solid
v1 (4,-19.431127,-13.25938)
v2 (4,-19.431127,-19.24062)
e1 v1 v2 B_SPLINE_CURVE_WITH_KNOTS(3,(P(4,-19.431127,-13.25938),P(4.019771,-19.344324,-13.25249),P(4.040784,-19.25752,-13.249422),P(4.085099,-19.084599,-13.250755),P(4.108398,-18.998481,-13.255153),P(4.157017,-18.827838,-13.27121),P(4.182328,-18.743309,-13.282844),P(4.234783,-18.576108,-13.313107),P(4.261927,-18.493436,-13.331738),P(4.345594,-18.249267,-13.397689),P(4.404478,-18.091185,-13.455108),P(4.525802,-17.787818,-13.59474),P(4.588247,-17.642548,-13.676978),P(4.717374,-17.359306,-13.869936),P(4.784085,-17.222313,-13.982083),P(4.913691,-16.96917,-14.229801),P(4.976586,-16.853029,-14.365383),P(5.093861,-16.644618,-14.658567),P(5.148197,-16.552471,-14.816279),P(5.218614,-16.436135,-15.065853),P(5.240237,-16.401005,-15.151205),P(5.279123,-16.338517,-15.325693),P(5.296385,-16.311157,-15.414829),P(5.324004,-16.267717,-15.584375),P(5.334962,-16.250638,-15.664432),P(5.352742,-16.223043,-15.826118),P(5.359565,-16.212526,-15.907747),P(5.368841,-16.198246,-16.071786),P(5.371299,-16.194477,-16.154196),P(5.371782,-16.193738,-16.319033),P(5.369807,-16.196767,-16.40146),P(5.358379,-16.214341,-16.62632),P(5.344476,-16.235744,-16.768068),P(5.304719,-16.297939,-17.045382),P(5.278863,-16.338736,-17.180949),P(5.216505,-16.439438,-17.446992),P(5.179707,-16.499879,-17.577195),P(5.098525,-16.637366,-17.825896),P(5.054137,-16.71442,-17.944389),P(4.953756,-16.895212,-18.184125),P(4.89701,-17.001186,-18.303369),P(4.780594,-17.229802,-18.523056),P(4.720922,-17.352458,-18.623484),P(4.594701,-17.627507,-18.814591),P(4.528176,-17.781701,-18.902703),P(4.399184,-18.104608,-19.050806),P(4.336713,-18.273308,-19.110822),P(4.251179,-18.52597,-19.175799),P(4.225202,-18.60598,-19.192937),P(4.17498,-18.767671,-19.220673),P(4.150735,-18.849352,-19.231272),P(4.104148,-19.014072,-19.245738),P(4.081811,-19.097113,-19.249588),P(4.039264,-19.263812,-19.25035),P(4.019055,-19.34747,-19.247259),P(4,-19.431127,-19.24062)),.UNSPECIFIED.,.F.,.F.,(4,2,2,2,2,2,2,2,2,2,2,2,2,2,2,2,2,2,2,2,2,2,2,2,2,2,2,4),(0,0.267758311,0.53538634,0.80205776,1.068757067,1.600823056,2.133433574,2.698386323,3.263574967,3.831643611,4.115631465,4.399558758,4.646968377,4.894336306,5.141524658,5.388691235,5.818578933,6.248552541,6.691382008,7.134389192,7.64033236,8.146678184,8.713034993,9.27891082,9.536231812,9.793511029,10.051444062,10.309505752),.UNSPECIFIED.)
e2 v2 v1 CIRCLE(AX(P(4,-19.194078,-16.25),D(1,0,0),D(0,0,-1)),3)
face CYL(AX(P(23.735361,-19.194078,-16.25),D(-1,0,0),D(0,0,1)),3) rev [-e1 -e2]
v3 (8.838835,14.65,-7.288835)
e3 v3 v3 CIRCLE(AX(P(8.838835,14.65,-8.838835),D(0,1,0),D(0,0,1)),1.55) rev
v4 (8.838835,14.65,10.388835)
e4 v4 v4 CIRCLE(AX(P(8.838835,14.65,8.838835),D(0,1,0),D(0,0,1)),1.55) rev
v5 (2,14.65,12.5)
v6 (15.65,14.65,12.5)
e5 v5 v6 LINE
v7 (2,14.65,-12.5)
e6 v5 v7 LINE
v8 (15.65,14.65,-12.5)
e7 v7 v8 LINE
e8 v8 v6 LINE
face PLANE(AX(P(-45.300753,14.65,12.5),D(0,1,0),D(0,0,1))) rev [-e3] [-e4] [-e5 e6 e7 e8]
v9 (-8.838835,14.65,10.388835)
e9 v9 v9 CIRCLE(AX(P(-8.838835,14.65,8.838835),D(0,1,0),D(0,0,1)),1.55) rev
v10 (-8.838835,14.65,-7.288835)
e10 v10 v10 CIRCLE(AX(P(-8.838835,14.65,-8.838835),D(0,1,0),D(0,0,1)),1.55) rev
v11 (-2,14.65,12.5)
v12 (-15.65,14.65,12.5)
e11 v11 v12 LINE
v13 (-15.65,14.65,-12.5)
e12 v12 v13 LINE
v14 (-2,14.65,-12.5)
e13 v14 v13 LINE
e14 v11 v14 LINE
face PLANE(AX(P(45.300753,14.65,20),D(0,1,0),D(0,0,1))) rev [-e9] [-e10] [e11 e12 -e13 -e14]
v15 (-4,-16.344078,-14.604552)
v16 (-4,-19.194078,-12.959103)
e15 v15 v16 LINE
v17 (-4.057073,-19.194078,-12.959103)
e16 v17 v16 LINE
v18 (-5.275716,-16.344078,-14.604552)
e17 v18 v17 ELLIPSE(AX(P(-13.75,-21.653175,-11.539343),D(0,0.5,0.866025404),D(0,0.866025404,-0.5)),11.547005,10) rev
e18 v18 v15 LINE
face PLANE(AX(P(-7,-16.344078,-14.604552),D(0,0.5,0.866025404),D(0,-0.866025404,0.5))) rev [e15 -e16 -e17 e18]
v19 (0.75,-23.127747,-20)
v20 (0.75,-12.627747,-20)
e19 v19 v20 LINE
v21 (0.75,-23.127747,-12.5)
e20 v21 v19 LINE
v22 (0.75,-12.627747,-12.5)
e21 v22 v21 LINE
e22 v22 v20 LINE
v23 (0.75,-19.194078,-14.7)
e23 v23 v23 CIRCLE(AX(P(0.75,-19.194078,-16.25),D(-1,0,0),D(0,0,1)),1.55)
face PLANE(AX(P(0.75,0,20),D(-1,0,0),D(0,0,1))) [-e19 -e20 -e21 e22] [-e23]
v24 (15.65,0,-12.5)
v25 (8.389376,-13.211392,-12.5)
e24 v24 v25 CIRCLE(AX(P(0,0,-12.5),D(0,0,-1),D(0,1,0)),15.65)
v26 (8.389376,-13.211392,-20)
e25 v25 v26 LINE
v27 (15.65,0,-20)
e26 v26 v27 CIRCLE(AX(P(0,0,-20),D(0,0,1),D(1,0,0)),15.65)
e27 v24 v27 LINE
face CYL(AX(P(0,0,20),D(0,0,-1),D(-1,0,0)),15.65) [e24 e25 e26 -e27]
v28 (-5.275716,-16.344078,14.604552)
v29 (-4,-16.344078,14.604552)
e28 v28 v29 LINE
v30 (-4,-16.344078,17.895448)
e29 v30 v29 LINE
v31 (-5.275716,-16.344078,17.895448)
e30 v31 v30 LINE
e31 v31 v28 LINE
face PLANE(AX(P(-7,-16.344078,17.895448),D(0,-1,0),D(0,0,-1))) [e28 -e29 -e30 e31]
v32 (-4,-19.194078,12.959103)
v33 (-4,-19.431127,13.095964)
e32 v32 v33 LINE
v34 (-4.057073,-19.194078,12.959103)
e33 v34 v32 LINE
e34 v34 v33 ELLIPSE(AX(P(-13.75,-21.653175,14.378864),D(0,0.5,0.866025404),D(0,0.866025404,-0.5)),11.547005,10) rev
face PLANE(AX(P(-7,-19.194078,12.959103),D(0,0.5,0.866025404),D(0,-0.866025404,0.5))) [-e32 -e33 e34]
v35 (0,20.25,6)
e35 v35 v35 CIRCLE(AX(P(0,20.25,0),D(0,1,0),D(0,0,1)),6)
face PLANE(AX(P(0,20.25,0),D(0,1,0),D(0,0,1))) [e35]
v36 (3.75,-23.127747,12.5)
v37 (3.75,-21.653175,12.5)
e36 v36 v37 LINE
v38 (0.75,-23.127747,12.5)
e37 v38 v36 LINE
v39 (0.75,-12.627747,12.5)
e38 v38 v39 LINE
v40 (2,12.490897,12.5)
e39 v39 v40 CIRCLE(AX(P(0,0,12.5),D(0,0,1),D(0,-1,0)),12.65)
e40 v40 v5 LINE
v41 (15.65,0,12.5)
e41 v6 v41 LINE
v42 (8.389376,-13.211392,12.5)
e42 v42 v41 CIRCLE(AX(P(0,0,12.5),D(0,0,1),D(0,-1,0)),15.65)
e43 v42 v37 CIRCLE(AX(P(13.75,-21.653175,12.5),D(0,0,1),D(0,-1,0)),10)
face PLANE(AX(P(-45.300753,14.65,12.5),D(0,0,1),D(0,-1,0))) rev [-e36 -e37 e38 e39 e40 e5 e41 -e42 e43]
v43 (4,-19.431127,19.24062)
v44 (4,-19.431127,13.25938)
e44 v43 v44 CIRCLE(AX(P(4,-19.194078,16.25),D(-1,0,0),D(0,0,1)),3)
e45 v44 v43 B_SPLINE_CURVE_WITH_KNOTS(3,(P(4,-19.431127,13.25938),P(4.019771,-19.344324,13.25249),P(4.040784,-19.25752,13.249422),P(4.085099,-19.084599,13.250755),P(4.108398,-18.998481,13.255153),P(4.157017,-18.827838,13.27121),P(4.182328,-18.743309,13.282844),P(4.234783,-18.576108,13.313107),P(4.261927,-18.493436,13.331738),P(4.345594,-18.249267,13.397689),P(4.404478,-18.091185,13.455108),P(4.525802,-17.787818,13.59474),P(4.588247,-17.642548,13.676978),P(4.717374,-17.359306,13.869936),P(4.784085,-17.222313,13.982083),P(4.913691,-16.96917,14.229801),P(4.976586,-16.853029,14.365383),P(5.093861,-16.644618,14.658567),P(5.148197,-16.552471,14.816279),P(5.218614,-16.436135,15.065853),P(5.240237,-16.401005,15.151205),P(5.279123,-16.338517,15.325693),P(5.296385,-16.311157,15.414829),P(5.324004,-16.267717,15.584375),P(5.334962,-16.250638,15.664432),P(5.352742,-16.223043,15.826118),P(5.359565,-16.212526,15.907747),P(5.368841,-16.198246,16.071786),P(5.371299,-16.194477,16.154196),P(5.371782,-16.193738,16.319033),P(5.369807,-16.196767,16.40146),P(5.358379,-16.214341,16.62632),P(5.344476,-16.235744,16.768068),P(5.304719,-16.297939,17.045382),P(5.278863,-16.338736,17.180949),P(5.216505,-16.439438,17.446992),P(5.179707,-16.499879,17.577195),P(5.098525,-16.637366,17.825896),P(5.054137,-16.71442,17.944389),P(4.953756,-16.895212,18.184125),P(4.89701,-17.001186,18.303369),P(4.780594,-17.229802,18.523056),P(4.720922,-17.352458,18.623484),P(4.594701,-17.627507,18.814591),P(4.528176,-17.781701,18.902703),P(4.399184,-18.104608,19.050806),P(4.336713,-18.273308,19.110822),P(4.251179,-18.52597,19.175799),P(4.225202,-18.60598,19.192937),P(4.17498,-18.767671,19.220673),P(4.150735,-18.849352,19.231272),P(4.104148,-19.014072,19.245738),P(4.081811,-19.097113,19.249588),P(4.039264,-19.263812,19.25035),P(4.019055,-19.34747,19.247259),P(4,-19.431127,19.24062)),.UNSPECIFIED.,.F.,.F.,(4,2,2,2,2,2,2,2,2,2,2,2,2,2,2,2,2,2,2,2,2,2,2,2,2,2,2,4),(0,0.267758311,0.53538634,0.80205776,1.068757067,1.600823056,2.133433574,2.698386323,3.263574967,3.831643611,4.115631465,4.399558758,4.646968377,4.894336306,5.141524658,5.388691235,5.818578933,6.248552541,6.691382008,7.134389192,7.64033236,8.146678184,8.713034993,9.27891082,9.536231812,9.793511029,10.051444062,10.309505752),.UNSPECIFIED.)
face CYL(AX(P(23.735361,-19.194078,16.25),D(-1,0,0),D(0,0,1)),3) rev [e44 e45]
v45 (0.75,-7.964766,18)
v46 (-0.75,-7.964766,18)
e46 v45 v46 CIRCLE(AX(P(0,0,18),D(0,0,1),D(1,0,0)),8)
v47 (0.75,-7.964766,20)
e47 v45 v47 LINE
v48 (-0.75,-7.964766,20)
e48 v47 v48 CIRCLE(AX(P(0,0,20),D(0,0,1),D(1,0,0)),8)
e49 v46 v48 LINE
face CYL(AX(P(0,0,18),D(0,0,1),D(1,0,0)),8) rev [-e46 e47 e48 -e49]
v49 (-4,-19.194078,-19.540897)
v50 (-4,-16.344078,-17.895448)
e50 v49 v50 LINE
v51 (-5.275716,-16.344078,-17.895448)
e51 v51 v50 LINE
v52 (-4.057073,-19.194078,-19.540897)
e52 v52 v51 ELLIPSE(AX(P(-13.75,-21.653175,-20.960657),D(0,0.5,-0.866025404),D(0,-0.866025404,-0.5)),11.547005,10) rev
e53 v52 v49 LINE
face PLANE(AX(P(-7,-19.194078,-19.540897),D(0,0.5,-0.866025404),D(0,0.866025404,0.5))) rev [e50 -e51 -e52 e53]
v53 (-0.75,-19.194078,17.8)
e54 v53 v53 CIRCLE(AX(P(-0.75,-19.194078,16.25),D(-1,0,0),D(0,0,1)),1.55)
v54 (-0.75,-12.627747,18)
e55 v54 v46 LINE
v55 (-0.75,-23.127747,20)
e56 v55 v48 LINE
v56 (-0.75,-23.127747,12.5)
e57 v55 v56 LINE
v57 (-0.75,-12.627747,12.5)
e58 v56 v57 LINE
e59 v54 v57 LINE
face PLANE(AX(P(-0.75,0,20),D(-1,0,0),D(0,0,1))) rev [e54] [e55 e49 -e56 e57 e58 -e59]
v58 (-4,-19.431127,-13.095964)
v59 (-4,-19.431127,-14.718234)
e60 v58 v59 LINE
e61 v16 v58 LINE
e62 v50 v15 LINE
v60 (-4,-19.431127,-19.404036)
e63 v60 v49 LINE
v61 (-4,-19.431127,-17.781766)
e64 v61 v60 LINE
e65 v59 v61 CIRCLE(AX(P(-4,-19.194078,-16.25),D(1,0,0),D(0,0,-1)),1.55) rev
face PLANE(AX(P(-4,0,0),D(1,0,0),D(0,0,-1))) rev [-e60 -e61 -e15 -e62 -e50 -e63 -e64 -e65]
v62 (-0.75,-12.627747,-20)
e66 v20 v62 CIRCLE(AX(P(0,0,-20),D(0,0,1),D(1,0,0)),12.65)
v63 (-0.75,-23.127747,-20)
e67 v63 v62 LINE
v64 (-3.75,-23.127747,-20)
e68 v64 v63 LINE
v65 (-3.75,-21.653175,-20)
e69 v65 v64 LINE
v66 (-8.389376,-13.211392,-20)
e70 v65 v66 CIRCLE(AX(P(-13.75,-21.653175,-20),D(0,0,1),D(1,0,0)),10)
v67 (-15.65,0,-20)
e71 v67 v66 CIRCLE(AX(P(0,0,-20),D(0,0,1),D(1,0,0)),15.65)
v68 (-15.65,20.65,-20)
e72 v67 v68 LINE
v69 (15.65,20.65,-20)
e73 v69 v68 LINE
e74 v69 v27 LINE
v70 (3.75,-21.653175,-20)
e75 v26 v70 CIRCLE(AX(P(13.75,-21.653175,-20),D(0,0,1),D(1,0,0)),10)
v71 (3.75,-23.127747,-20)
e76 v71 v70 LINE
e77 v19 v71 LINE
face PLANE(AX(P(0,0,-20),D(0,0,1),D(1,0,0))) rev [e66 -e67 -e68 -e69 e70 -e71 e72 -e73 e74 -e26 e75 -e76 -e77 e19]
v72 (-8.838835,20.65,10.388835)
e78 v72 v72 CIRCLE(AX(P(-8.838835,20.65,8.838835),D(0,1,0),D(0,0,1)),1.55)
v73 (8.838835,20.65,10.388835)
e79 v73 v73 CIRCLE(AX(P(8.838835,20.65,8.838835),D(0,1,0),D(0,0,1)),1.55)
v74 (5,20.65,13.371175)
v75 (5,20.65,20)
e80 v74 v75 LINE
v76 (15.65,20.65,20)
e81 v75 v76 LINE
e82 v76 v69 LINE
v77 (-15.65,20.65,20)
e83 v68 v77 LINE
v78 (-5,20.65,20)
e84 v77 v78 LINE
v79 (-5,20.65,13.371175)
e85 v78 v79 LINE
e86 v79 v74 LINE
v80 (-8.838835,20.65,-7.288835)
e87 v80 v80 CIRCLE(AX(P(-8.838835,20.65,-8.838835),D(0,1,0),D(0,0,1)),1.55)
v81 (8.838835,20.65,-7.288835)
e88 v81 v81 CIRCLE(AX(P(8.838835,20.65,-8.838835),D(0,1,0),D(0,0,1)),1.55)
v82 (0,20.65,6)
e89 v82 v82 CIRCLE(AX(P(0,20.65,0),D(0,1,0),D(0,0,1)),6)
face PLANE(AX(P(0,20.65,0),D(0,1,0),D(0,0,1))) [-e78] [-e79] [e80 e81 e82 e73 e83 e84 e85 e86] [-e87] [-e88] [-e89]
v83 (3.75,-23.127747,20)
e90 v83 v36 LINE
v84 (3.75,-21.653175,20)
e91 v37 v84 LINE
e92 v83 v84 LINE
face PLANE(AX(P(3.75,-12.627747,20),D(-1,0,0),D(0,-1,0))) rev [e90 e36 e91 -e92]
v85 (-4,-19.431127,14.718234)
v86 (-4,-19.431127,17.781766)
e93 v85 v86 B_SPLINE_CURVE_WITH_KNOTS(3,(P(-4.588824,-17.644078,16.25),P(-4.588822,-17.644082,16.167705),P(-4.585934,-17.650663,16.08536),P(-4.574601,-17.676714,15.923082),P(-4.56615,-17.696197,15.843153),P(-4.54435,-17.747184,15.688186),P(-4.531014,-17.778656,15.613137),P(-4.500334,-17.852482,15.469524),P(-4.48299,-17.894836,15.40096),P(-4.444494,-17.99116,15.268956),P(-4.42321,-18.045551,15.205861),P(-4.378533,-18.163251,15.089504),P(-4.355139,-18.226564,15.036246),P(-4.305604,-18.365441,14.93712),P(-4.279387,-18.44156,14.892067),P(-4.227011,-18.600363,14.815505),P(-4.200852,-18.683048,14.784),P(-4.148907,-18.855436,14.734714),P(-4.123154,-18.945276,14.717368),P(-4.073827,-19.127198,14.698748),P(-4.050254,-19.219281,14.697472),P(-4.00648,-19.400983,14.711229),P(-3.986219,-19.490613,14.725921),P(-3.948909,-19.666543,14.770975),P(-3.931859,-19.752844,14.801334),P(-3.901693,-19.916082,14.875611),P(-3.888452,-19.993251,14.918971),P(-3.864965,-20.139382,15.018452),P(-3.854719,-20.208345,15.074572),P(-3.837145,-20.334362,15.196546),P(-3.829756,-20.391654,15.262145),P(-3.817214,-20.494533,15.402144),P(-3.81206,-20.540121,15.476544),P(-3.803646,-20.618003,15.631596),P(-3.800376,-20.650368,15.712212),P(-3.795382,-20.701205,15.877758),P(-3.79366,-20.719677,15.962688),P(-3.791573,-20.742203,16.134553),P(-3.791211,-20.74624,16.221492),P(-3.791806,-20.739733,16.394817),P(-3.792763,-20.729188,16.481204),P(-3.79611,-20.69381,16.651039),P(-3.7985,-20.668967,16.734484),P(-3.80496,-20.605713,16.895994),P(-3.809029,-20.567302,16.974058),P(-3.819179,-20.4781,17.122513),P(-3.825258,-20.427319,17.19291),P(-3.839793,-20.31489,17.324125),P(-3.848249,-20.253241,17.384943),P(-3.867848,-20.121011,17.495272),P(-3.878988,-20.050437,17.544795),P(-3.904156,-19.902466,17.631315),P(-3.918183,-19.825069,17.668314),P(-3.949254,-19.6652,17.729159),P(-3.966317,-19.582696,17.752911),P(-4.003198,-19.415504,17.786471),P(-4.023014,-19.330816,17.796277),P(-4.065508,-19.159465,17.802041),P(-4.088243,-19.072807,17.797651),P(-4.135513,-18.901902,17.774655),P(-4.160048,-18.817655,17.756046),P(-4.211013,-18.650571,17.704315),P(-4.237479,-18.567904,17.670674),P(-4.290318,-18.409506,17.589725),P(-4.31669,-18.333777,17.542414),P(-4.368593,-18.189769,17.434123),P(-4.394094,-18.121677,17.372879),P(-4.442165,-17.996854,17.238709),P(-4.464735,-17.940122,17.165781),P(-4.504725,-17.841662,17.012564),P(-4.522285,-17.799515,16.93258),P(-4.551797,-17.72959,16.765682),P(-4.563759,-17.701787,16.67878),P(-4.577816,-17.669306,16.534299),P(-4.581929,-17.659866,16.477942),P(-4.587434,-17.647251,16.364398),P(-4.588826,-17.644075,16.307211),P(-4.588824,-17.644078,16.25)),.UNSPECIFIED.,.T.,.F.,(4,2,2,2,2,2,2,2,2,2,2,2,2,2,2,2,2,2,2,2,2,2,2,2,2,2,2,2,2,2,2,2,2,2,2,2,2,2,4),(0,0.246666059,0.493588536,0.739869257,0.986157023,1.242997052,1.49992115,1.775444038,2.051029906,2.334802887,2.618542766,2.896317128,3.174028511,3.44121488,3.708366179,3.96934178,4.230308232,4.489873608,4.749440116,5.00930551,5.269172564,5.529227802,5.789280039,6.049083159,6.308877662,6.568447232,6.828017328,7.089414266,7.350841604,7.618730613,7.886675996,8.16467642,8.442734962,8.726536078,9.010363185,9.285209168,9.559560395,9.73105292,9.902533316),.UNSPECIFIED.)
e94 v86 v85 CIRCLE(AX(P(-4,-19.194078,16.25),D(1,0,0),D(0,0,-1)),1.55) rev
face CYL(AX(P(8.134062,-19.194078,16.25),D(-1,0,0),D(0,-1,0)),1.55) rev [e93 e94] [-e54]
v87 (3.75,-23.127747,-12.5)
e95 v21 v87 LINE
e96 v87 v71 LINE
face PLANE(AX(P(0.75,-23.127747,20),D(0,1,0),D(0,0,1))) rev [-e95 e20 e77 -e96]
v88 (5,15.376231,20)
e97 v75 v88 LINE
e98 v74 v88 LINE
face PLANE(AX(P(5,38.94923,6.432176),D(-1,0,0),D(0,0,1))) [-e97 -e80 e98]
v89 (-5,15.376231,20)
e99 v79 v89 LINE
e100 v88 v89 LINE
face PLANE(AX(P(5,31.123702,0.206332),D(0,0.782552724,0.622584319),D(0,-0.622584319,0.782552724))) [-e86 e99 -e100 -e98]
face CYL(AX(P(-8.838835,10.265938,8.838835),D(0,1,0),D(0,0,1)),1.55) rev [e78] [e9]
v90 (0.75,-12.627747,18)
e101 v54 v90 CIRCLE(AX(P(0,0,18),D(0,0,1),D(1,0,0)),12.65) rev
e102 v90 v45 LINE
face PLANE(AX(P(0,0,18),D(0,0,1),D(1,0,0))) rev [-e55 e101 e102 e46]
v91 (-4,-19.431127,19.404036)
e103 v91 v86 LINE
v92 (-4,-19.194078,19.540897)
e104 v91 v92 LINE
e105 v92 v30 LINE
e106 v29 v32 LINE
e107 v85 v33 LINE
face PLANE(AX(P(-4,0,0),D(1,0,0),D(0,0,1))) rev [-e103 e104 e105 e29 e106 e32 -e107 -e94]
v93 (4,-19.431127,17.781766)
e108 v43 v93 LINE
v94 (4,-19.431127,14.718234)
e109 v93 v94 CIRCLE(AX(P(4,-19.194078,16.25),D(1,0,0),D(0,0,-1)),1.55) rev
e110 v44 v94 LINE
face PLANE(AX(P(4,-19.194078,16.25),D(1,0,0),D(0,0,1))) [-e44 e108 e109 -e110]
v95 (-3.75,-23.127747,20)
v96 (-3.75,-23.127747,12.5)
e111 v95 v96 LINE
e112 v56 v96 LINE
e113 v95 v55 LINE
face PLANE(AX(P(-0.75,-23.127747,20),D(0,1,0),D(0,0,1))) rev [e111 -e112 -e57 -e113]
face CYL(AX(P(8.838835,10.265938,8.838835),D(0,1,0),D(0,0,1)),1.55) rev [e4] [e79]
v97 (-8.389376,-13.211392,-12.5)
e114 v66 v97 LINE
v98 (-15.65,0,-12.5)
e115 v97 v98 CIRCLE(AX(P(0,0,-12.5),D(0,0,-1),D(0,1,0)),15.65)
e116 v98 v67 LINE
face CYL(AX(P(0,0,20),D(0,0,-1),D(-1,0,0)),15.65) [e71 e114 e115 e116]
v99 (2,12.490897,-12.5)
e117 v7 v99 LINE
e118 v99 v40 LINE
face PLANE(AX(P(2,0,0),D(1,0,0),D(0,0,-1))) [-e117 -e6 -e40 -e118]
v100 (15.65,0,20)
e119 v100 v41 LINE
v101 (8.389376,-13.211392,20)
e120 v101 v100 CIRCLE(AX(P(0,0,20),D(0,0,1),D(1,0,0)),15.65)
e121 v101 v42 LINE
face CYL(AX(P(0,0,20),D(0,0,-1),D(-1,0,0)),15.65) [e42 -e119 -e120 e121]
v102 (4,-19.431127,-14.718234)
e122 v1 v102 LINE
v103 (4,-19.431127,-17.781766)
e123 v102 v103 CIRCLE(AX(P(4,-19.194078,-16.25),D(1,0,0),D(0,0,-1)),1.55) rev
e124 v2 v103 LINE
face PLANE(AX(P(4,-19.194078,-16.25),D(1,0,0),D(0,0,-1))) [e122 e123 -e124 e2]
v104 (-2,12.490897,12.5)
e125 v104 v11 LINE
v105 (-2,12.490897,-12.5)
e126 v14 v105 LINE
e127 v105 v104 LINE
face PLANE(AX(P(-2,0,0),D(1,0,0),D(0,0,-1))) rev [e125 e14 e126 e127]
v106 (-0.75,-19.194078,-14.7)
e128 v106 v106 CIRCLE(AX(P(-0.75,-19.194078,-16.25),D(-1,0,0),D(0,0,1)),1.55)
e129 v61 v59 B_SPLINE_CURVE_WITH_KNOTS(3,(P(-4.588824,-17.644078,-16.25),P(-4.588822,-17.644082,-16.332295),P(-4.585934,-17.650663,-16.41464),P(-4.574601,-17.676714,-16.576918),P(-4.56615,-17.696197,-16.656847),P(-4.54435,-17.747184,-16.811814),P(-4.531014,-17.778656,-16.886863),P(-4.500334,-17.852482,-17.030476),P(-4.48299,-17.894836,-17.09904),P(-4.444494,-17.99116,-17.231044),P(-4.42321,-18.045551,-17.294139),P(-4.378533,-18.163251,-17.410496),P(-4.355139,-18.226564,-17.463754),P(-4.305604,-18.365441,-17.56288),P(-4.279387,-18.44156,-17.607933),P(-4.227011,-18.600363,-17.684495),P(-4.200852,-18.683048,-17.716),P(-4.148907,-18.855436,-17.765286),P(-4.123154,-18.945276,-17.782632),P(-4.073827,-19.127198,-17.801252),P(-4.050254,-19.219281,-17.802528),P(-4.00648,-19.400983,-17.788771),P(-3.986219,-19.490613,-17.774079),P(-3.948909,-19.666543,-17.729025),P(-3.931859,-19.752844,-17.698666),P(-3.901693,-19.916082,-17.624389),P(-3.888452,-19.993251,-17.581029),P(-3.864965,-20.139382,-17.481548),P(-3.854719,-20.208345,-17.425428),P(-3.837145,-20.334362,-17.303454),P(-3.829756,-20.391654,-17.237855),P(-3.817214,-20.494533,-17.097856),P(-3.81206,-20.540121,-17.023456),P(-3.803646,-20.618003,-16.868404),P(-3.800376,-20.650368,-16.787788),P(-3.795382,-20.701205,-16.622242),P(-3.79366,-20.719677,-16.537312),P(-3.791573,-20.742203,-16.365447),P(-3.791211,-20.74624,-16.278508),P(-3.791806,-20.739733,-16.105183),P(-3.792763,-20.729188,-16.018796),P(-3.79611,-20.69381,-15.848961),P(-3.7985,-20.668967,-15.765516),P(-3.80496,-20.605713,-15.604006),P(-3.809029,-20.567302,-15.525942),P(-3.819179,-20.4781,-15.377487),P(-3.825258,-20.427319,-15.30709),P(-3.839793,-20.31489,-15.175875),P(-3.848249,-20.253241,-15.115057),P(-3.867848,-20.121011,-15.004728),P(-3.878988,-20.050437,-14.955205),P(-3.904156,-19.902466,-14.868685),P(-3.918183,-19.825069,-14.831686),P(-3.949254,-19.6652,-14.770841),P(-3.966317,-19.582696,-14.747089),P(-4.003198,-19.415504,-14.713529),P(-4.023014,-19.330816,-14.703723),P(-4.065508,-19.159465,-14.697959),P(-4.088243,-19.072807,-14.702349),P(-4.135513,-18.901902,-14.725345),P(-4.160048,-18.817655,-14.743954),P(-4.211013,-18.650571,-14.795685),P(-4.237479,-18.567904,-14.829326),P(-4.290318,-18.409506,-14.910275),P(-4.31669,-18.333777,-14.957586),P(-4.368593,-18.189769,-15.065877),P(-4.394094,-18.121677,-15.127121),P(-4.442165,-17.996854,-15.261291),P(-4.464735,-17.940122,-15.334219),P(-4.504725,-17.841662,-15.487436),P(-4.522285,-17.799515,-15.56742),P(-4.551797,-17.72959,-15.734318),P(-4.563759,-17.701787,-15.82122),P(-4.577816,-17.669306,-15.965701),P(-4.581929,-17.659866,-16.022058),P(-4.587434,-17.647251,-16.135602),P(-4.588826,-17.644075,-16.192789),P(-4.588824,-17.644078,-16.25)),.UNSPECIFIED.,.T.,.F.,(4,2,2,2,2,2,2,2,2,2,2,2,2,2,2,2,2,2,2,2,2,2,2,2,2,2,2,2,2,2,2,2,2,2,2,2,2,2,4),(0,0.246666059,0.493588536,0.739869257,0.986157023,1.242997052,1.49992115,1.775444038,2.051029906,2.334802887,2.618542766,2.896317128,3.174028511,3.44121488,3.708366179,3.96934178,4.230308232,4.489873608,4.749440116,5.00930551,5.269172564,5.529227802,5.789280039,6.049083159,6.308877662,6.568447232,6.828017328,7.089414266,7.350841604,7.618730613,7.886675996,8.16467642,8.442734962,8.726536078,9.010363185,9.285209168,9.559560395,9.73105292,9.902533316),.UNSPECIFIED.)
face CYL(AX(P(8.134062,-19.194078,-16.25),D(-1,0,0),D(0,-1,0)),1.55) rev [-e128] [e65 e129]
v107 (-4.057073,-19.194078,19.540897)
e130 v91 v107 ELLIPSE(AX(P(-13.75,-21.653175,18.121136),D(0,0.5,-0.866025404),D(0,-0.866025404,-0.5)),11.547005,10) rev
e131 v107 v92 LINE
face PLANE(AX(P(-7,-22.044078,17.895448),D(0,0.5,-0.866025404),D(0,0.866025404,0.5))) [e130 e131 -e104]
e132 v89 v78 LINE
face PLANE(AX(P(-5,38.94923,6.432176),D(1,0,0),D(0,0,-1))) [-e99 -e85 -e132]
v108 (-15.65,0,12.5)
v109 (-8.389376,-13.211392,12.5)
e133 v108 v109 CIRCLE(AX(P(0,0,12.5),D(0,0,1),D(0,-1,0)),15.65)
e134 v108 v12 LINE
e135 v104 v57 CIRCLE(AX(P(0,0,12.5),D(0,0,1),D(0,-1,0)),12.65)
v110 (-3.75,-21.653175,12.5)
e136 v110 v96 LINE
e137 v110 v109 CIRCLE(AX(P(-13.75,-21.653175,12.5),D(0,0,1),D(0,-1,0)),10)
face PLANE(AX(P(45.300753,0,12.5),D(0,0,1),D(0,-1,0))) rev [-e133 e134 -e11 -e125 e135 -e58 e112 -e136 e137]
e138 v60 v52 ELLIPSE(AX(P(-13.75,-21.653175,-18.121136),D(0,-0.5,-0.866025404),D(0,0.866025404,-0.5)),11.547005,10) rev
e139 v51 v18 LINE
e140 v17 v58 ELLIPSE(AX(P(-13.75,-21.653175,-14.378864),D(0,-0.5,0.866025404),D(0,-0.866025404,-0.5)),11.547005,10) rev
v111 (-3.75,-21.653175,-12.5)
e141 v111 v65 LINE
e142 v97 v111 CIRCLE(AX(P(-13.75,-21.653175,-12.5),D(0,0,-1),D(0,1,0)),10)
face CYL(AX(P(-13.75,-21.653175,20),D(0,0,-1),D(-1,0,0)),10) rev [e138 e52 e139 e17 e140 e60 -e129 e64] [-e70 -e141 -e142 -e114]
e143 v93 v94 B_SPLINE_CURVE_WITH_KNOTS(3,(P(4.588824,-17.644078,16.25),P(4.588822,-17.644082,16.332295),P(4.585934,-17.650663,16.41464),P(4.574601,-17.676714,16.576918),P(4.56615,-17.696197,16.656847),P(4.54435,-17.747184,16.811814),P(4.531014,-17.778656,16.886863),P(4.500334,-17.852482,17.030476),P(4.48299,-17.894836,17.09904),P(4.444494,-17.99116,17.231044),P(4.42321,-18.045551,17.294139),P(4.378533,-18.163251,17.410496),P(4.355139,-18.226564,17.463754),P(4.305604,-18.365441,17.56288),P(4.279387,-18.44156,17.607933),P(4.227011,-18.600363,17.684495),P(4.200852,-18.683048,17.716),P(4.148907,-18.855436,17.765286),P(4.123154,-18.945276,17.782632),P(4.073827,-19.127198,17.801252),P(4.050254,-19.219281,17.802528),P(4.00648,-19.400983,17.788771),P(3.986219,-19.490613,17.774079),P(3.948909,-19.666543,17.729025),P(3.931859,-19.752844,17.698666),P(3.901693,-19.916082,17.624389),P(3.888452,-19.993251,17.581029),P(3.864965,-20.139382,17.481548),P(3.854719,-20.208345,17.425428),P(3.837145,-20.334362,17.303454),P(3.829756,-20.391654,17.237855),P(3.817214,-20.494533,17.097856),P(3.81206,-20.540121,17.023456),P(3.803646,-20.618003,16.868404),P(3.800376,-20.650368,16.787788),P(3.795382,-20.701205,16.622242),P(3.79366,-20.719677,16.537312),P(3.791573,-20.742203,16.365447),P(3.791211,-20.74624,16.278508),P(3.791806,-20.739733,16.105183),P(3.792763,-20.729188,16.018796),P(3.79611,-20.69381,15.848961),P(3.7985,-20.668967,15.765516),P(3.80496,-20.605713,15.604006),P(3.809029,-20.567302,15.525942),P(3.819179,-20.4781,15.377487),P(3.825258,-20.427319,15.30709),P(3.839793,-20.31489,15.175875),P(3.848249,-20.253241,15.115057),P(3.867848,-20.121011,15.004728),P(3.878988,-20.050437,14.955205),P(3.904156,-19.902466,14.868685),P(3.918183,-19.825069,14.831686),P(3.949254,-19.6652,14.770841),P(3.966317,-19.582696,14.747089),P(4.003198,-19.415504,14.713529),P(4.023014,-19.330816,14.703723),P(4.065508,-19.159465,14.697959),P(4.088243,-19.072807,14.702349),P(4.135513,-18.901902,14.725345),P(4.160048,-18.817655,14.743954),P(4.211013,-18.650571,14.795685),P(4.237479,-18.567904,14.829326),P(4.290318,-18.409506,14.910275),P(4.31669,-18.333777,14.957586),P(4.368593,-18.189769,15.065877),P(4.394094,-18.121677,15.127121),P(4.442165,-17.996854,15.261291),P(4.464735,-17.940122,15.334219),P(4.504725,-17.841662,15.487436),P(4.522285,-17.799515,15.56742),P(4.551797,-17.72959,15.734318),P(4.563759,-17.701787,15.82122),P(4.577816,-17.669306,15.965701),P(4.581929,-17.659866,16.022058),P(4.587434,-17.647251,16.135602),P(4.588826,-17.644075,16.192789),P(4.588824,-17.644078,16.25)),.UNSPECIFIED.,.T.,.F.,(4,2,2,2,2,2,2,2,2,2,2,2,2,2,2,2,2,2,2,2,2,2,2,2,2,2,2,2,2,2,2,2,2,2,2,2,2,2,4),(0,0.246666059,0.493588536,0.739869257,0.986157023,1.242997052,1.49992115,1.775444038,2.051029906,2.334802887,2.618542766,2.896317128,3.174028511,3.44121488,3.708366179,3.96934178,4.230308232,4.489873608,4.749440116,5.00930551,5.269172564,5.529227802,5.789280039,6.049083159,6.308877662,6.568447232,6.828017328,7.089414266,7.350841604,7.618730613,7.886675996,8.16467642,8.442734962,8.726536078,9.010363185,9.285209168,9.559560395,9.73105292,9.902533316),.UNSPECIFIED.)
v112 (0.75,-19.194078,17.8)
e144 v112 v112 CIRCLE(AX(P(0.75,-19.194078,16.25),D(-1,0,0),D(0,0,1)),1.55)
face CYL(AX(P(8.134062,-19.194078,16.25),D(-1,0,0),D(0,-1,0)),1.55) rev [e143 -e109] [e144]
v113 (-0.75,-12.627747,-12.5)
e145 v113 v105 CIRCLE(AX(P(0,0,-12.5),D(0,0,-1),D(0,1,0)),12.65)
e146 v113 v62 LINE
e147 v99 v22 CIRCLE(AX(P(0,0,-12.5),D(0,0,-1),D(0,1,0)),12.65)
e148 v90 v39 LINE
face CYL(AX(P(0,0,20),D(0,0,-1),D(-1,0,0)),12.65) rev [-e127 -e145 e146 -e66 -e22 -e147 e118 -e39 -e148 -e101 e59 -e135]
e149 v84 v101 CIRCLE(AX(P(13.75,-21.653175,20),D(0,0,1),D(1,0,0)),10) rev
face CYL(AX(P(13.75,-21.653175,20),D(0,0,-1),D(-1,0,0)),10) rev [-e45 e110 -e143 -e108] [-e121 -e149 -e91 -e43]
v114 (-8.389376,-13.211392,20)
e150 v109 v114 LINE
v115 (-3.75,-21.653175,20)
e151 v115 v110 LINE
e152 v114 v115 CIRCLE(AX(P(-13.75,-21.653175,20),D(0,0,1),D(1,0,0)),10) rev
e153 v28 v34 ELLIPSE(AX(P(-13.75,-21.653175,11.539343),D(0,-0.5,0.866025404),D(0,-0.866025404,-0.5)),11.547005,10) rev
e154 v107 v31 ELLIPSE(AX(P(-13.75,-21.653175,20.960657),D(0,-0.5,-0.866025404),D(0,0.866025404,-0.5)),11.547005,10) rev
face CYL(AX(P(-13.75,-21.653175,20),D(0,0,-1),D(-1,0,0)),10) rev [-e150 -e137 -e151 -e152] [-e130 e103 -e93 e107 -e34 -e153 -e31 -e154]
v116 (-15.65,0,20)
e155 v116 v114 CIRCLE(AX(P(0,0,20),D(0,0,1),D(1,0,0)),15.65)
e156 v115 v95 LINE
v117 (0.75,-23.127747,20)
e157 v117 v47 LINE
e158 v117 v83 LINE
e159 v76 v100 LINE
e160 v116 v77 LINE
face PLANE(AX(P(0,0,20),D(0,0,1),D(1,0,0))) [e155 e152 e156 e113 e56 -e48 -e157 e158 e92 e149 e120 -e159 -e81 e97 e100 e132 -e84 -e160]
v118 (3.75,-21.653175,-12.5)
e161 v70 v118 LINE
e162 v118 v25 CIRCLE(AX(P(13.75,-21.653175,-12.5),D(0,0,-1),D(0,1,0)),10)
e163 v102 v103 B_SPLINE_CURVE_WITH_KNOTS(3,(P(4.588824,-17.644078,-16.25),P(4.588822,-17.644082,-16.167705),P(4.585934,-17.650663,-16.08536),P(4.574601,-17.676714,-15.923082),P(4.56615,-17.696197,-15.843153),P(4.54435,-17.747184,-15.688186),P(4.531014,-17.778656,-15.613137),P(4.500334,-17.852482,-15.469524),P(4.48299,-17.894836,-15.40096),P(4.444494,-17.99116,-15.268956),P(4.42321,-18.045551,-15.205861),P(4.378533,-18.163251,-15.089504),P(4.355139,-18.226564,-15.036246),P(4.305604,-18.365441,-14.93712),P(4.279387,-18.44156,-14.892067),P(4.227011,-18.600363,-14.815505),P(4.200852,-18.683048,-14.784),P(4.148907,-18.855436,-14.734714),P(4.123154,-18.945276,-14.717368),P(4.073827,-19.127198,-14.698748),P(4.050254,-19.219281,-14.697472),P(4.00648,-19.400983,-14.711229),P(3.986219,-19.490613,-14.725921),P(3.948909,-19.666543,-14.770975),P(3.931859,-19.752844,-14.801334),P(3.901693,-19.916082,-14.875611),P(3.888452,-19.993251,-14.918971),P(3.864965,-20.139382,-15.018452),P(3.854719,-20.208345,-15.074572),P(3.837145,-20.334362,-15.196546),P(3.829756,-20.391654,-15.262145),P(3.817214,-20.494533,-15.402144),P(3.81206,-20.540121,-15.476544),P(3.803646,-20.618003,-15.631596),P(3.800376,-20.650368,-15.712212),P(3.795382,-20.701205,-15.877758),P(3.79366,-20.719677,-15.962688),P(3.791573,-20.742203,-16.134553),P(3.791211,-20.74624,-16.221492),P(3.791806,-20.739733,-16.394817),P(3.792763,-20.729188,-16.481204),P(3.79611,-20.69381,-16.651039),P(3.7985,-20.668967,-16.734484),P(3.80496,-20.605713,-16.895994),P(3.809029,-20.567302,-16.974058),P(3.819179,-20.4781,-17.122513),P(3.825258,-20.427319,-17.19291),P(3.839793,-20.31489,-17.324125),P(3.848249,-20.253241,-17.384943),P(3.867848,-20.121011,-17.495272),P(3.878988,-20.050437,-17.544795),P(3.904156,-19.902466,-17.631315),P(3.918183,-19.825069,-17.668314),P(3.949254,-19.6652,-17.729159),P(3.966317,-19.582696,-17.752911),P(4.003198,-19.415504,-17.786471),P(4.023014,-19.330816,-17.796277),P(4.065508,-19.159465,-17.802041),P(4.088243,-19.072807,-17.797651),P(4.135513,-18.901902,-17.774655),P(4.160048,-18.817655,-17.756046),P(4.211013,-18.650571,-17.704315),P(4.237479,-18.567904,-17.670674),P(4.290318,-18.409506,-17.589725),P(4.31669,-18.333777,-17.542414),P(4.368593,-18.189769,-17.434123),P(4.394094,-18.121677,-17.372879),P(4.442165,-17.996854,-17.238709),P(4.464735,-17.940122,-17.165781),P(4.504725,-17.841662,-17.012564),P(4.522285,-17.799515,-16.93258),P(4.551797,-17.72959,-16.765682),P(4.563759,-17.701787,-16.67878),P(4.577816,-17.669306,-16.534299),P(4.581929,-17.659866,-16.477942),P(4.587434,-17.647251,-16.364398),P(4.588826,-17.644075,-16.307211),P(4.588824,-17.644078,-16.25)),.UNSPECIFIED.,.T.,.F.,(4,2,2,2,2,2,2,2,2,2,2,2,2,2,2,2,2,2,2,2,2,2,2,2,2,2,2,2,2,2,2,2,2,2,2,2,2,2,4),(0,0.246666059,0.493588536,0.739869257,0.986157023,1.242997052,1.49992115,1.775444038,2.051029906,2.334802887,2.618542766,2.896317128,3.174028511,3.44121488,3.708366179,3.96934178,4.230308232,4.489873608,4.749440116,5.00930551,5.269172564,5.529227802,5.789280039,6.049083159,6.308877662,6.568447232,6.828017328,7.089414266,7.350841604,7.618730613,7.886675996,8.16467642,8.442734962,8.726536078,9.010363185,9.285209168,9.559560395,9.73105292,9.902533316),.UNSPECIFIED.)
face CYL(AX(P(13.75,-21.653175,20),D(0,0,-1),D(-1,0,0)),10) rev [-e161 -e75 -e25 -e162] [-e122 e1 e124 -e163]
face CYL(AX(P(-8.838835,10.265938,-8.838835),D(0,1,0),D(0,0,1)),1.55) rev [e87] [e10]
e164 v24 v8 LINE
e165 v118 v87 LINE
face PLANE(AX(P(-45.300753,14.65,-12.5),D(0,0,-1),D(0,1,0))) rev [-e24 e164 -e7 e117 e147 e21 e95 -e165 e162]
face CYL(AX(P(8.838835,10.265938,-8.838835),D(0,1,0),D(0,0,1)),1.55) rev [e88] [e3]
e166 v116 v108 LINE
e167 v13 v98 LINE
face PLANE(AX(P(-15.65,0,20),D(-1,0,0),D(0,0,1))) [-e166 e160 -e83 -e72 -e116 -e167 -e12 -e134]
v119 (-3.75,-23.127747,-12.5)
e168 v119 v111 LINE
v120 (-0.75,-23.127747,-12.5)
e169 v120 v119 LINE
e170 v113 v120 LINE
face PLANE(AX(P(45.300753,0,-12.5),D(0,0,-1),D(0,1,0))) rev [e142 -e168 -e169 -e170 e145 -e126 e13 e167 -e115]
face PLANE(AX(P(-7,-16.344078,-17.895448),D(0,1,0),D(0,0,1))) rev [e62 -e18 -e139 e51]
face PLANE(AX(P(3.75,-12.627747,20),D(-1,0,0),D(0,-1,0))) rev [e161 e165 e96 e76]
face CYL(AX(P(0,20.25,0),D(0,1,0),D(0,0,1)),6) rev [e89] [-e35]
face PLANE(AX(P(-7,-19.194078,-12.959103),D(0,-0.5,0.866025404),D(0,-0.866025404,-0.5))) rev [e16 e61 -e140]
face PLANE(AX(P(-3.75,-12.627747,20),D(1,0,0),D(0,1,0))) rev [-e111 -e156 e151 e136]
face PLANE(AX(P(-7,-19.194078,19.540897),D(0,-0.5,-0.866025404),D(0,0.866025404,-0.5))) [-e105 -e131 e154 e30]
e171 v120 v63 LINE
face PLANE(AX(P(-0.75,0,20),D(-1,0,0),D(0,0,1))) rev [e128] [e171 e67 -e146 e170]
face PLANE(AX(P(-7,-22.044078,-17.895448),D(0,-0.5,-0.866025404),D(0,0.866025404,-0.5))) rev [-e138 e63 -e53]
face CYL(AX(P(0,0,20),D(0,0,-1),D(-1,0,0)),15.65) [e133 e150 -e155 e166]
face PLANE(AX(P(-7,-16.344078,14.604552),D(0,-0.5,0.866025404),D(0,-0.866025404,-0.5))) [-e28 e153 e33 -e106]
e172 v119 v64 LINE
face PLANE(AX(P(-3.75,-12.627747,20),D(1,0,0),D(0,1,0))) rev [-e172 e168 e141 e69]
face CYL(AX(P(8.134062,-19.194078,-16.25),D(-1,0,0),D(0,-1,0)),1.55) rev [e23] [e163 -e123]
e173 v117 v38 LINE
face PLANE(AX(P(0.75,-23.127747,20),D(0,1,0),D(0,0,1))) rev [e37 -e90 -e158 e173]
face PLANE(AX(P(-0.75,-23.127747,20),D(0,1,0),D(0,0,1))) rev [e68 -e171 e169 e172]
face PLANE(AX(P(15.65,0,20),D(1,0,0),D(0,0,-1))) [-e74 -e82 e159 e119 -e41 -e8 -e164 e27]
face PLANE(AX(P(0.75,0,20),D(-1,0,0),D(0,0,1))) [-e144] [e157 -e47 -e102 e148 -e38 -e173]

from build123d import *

# Parameters (mm, degrees)
BOSS_EXTRUDE1_DEPTH   = 20
SKETCH2_W             = 3
SKETCH2_H             = 10.5
BOSS_EXTRUDE2_DEPTH   = 20
SKETCH4_W             = 31.3
SKETCH4_H             = 40
BOSS_EXTRUDE3_DEPTH   = 5
SKETCH5_W             = 25
SKETCH5_H             = 37.777747226
CUT_EXTRUDE2_DEPTH    = 13.65
SKETCH6_R             = 1.55
MOTORMOUNTHOLES_DEPTH = 6
CLAMPHOLES_REACH      = 38.211
SKETCH8_R             = 1.55
ENDSTOPPER_DEPTH      = 2
CUT_EXTRUDE7_START    = -15.65
SKETCH10_W            = 25
SKETCH10_H            = 37.777747226
CUT_EXTRUDE7_DEPTH    = 13.65
SKETCH11_W            = 25
SKETCH11_H            = 10.636850541
CUT_EXTRUDE8_DEPTH    = 4
FILLET1_START         = -20
FILLET1_DEPTH         = 2.1999999
FILLET1_START_2       = -14.6999999
FILLET1_2_DEPTH       = 2.1999999
FILLET1_START_3       = 12.5
FILLET1_3_DEPTH       = 2.1999999
FILLET1_START_4       = 17.8000001
FILLET1_4_DEPTH       = 2.1999999
FILLET1_START_5       = -17.8000001
FILLET1_5_DEPTH       = 3.1000002
FILLET1_START_6       = 14.6999999
FILLET1_6_DEPTH       = 3.1000002
FILLET1_START_7       = -8.389376218
FILLET1_7_OUTLINE_R   = 1.55
FILLET1_7_DEPTH       = 16.778752436
SKETCH13_W            = 10
SKETCH13_H            = 10
CUT_EXTRUDE10_REACH   = 40.348
CUT_EXTRUDE10_START   = 4
SKETCH15_R            = 3
CUT_EXTRUDE11_START   = -4
CUT_EXTRUDE11_DEPTH   = 3
SKETCH17_R            = 6
SHAFT_CLEARANCE_DEPTH = 0.4


with BuildPart() as part:
    # Sketch1 → Boss-Extrude1 (new, symmetric)
    with BuildSketch(Plane.XY):
        with BuildLine():
            Line((-15.65, 15.65), (-15.65, 0))
            ThreePointArc((-15.65, 0), (-11.066221106, 11.066221145), (5.4e-08, 15.65))
            Line((5.4e-08, 15.65), (-15.65, 15.65))
        make_face()
        with BuildLine():
            Line((15.65, 15.65), (5.4e-08, 15.65))
            ThreePointArc((5.4e-08, 15.65), (11.066221145, 11.066221106), (15.65, 0))
            Line((15.65, 0), (15.65, 15.65))
        make_face()
        with BuildLine():
            ThreePointArc((5.4e-08, 15.65), (-11.066221106, 11.066221145), (-15.65, 0))
            ThreePointArc((-15.65, 0), (-11.328283189, -10.797800702), (-0.75, -15.632018424))
            Line((-0.75, -15.632018424), (-0.75, -12.627747226))
            ThreePointArc((-0.75, -12.627747226), (-8.675684411, 9.206247878), (12.65, 0))
            ThreePointArc((12.65, 0), (9.206247878, -8.675684411), (0.75, -12.627747226))
            Line((0.75, -12.627747226), (0.75, -15.632018424))
            ThreePointArc((0.75, -15.632018424), (11.328283189, -10.797800702), (15.65, 0))
            ThreePointArc((15.65, 0), (11.066221145, 11.066221106), (5.4e-08, 15.65))
        make_face()
    extrude(amount=BOSS_EXTRUDE1_DEPTH, both=True)

    # Sketch2 → Boss-Extrude2 (add, symmetric)
    with BuildSketch(Plane.XY):
        with Locations((-2.25, -17.877747226)):
            Rectangle(SKETCH2_W, SKETCH2_H)
        with Locations((2.25, -17.877747226)):
            Rectangle(SKETCH2_W, SKETCH2_H)
    extrude(amount=BOSS_EXTRUDE2_DEPTH, both=True)

    # Sketch4 → Boss-Extrude3 (add)
    with BuildSketch(Plane(origin=(0, 15.65, 0), x_dir=(1, 0, 0), z_dir=(0, 1, 0))):
        Rectangle(SKETCH4_W, SKETCH4_H)
    extrude(amount=BOSS_EXTRUDE3_DEPTH)

    # Sketch5 → Cut-Extrude2 (cut)
    with BuildSketch(Plane(origin=(15.65, 0, 0), x_dir=(0, 0, -1), z_dir=(1, 0, 0))):
        with Locations((0, -4.238873613)):
            Rectangle(SKETCH5_W, SKETCH5_H)
    extrude(amount=-CUT_EXTRUDE2_DEPTH, mode=Mode.SUBTRACT)

    # Sketch6 → MotorMountHoles (cut)
    with BuildSketch(Plane(origin=(0, 20.65, 0), x_dir=(1, 0, 0), z_dir=(0, 1, 0))):
        with Locations(Location((-8.838834765, 8.838834765, 0), (0, 0, 270))):
            Circle(SKETCH6_R)
        with Locations(Location((8.838834765, 8.838834765, 0), (0, 0, 270))):
            Circle(SKETCH6_R)
        with Locations(Location((8.838834765, -8.838834765, 0), (0, 0, 270))):
            Circle(SKETCH6_R)
        with Locations(Location((-8.838834765, -8.838834765, 0), (0, 0, 270))):
            Circle(SKETCH6_R)
    extrude(amount=-MOTORMOUNTHOLES_DEPTH, mode=Mode.SUBTRACT)

    # ClampHoles: up to this face of the body (flat: up to its plane)
    clampholes_end = Plane(part.part.faces().sort_by_distance((3.75, -19.16091251, 16.25))[0])
    # Sketch8 → ClampHoles (cut, up to the picked face)
    with BuildSketch(Plane.ZY.offset(3.75), mode=Mode.PRIVATE) as clampholes_sk1:
        with Locations(Location((16.25, -19.194077794, 0), (0, 0, 270))):
            Circle(SKETCH8_R)
    clampholes_tool1 = split(extrude(clampholes_sk1.sketch, amount=-CLAMPHOLES_REACH, mode=Mode.PRIVATE), bisect_by=clampholes_end, keep=Keep.BOTH, mode=Mode.PRIVATE)
    # Sketch8 → ClampHoles (cut, up to the picked face)
    with BuildSketch(Plane.ZY.offset(3.75), mode=Mode.PRIVATE) as clampholes_sk2:
        with Locations(Location((-16.25, -19.194077794, 0), (0, 0, 270))):
            Circle(SKETCH8_R)
    clampholes_tool2 = split(extrude(clampholes_sk2.sketch, amount=-CLAMPHOLES_REACH, mode=Mode.PRIVATE), bisect_by=clampholes_end, keep=Keep.BOTH, mode=Mode.PRIVATE)
    add(clampholes_tool1.solids().sort_by(Axis((-3.75, -19.194078, 16.25), (1, 0, 0)))[0], mode=Mode.SUBTRACT)
    add(clampholes_tool2.solids().sort_by(Axis((-3.75, -19.194078, -16.25), (1, 0, 0)))[0], mode=Mode.SUBTRACT)

    # Sketch9 → EndStopper (add)
    with BuildSketch(Plane.XY.offset(20)):
        with BuildLine():
            ThreePointArc((12.65, 0), (-8.675684411, 9.206247878), (-0.75, -12.627747226))
            Line((-0.75, -12.627747226), (-0.75, -7.964766161))
            ThreePointArc((-0.75, -7.964766161), (-5.385164807, 5.916079783), (8, 0))
            ThreePointArc((8, 0), (5.916079783, -5.385164807), (0.75, -7.964766161))
            Line((0.75, -7.964766161), (0.75, -12.627747226))
            ThreePointArc((0.75, -12.627747226), (9.206247878, -8.675684411), (12.65, 0))
        make_face()
    extrude(amount=-ENDSTOPPER_DEPTH)

    # Sketch10 → Cut-Extrude7 (cut)
    with BuildSketch(Plane(origin=(0, 0, 0), x_dir=(0, 0, -1), z_dir=(1, 0, 0)).offset(CUT_EXTRUDE7_START)):
        with Locations((0, -4.238873613)):
            Rectangle(SKETCH10_W, SKETCH10_H)
    extrude(amount=CUT_EXTRUDE7_DEPTH, mode=Mode.SUBTRACT)

    # Sketch11 → Cut-Extrude8 (cut)
    with BuildSketch(Plane.ZY.offset(2)):
        with Locations((0, -17.809321955)):
            Rectangle(SKETCH11_W, SKETCH11_H)
    extrude(amount=-CUT_EXTRUDE8_DEPTH, mode=Mode.SUBTRACT)

    # Fillet1: read off the stored shape, not the designer's step
    # Fillet1 outline → Fillet1 (add)
    with BuildSketch(Plane.XY.offset(FILLET1_START)):
        with BuildLine():
            Line((3.75, -15.194077794), (3.75, -21.653175287))
            ThreePointArc((3.75, -21.653175287), (4.986261134, -16.83686123), (8.389376218, -13.211391549))
            ThreePointArc((8.389376218, -13.211391549), (6.150111782, -14.39092162), (3.75, -15.194077794))
        make_face()
        with BuildLine():
            ThreePointArc((-3.75, -15.194077794), (-6.150111782, -14.39092162), (-8.389376218, -13.21139155))
            ThreePointArc((-8.389376218, -13.21139155), (-4.986261134, -16.83686123), (-3.75, -21.653175287))
            Line((-3.75, -21.653175287), (-3.75, -15.194077794))
        make_face()
    extrude(amount=FILLET1_DEPTH)

    # Fillet1 2 outline → Fillet1 2 (add)
    with BuildSketch(Plane.XY.offset(FILLET1_START_2)):
        with BuildLine():
            Line((3.75, -15.194077794), (3.75, -21.653175287))
            ThreePointArc((3.75, -21.653175287), (4.986261134, -16.83686123), (8.389376218, -13.211391549))
            ThreePointArc((8.389376218, -13.211391549), (6.150111782, -14.39092162), (3.75, -15.194077794))
        make_face()
        with BuildLine():
            ThreePointArc((-3.75, -15.194077794), (-6.150111782, -14.39092162), (-8.389376218, -13.21139155))
            ThreePointArc((-8.389376218, -13.21139155), (-4.986261134, -16.83686123), (-3.75, -21.653175287))
            Line((-3.75, -21.653175287), (-3.75, -15.194077794))
        make_face()
    extrude(amount=FILLET1_2_DEPTH)

    # Fillet1 3 outline → Fillet1 3 (add)
    with BuildSketch(Plane.XY.offset(FILLET1_START_3)):
        with BuildLine():
            Line((3.75, -15.194077794), (3.75, -21.653175287))
            ThreePointArc((3.75, -21.653175287), (4.986261134, -16.83686123), (8.389376218, -13.211391549))
            ThreePointArc((8.389376218, -13.211391549), (6.150111782, -14.39092162), (3.75, -15.194077794))
        make_face()
        with BuildLine():
            ThreePointArc((-3.75, -15.194077794), (-6.150111782, -14.39092162), (-8.389376218, -13.21139155))
            ThreePointArc((-8.389376218, -13.21139155), (-4.986261134, -16.83686123), (-3.75, -21.653175287))
            Line((-3.75, -21.653175287), (-3.75, -15.194077794))
        make_face()
    extrude(amount=FILLET1_3_DEPTH)

    # Fillet1 4 outline → Fillet1 4 (add)
    with BuildSketch(Plane.XY.offset(FILLET1_START_4)):
        with BuildLine():
            Line((3.75, -15.194077794), (3.75, -21.653175287))
            ThreePointArc((3.75, -21.653175287), (4.986261134, -16.83686123), (8.389376218, -13.211391549))
            ThreePointArc((8.389376218, -13.211391549), (6.150111782, -14.39092162), (3.75, -15.194077794))
        make_face()
        with BuildLine():
            ThreePointArc((-3.75, -15.194077794), (-6.150111782, -14.39092162), (-8.389376218, -13.21139155))
            ThreePointArc((-8.389376218, -13.21139155), (-4.986261134, -16.83686123), (-3.75, -21.653175287))
            Line((-3.75, -21.653175287), (-3.75, -15.194077794))
        make_face()
    extrude(amount=FILLET1_4_DEPTH)

    # Fillet1 5 outline → Fillet1 5 (add)
    with BuildSketch(Plane.XY.offset(FILLET1_START_5)):
        with BuildLine():
            Line((3.75, -15.194077794), (3.75, -21.653175287))
            ThreePointArc((3.75, -21.653175287), (4.986261134, -16.83686123), (8.389376218, -13.211391549))
            ThreePointArc((8.389376218, -13.211391549), (6.150111782, -14.39092162), (3.75, -15.194077794))
        make_face()
        with BuildLine():
            ThreePointArc((-3.75, -15.194077794), (-6.150111782, -14.39092162), (-8.389376218, -13.21139155))
            ThreePointArc((-8.389376218, -13.21139155), (-4.986261134, -16.83686123), (-3.75, -21.653175287))
            Line((-3.75, -21.653175287), (-3.75, -15.194077794))
        make_face()
    extrude(amount=FILLET1_5_DEPTH)

    # Fillet1 6 outline → Fillet1 6 (add)
    with BuildSketch(Plane.XY.offset(FILLET1_START_6)):
        with BuildLine():
            Line((3.75, -15.194077794), (3.75, -21.653175287))
            ThreePointArc((3.75, -21.653175287), (4.986261134, -16.83686123), (8.389376218, -13.211391549))
            ThreePointArc((8.389376218, -13.211391549), (6.150111782, -14.39092162), (3.75, -15.194077794))
        make_face()
        with BuildLine():
            ThreePointArc((-3.75, -15.194077794), (-6.150111782, -14.39092162), (-8.389376218, -13.21139155))
            ThreePointArc((-8.389376218, -13.21139155), (-4.986261134, -16.83686123), (-3.75, -21.653175287))
            Line((-3.75, -21.653175287), (-3.75, -15.194077794))
        make_face()
    extrude(amount=FILLET1_6_DEPTH)

    # Fillet1 7 outline → Fillet1 7 (cut)
    with BuildSketch(Plane.YZ.offset(FILLET1_START_7)):
        with Locations((-19.194077794, -16.25)):
            Circle(FILLET1_7_OUTLINE_R)
        with Locations((-19.194077794, 16.25)):
            Circle(FILLET1_7_OUTLINE_R)
    extrude(amount=FILLET1_7_DEPTH, mode=Mode.SUBTRACT)

    # Cut-Sweep1: sweep along a path in Sketch12
    with BuildLine(Plane(origin=(0, 0, 0), x_dir=(0, 0, -1), z_dir=(1, 0, 0))) as cut_sweep1_path:
        Line((-2.775739564, 34.353299637), (-30.459033802, 12.328988213))
    # Sketch13 → Cut-Sweep1 (sweep, cut)
    with BuildSketch(Plane(origin=(0, 11.963370534, -15.037269505), x_dir=(-1, 0, 0), z_dir=(0, 0.6225843191548198, -0.7825527238100508))):
        with Locations((0, 29.484397462)):
            Rectangle(SKETCH13_W, SKETCH13_H)
    sweep(path=cut_sweep1_path.line, mode=Mode.SUBTRACT)

    # Sketch15 → Cut-Extrude10 (cut, up to next)
    with BuildSketch(Plane(origin=(0, 0, 0), x_dir=(0, 0, -1), z_dir=(1, 0, 0)).offset(CUT_EXTRUDE10_START), mode=Mode.PRIVATE) as cut_extrude10_sk1:
        with Locations((16.25, -19.194077794)):
            Circle(SKETCH15_R)
    cut_extrude10_tool1 = extrude(cut_extrude10_sk1.sketch, amount=CUT_EXTRUDE10_REACH, mode=Mode.PRIVATE) & part.part
    cut_extrude10 = cut_extrude10_tool1.solids().sort_by_distance((4, -19.194078, -16.25))[0]
    add(cut_extrude10, mode=Mode.SUBTRACT)

    # Sketch16 → Cut-Extrude11 (cut)
    with BuildSketch(Plane(origin=(0, 0, 0), x_dir=(0, 0, -1), z_dir=(1, 0, 0)).offset(CUT_EXTRUDE11_START)):
        Polygon((12.959103466, -19.194077794), (14.604551733, -22.044077794), (17.895448267, -22.044077794), (19.540896534, -19.194077794), (17.895448267, -16.344077794), (14.604551733, -16.344077794), align=None)
    cut_extrude11 = extrude(amount=-CUT_EXTRUDE11_DEPTH, mode=Mode.SUBTRACT)

    # Mirror1: Cut-Extrude10, Cut-Extrude11 across plane
    add(cut_extrude10.mirror(Plane.XY), mode=Mode.SUBTRACT)
    add(cut_extrude11.mirror(Plane.XY), mode=Mode.SUBTRACT)

    # Sketch17 → Shaft Clearance (cut)
    with BuildSketch(Plane(origin=(0, 20.65, 0), x_dir=(1, 0, 0), z_dir=(0, 1, 0))):
        with Locations(Location((0, 0, 0), (0, 0, 270))):
            Circle(SKETCH17_R)
    extrude(amount=-SHAFT_CLEARANCE_DEPTH, mode=Mode.SUBTRACT)


solid = part.part
